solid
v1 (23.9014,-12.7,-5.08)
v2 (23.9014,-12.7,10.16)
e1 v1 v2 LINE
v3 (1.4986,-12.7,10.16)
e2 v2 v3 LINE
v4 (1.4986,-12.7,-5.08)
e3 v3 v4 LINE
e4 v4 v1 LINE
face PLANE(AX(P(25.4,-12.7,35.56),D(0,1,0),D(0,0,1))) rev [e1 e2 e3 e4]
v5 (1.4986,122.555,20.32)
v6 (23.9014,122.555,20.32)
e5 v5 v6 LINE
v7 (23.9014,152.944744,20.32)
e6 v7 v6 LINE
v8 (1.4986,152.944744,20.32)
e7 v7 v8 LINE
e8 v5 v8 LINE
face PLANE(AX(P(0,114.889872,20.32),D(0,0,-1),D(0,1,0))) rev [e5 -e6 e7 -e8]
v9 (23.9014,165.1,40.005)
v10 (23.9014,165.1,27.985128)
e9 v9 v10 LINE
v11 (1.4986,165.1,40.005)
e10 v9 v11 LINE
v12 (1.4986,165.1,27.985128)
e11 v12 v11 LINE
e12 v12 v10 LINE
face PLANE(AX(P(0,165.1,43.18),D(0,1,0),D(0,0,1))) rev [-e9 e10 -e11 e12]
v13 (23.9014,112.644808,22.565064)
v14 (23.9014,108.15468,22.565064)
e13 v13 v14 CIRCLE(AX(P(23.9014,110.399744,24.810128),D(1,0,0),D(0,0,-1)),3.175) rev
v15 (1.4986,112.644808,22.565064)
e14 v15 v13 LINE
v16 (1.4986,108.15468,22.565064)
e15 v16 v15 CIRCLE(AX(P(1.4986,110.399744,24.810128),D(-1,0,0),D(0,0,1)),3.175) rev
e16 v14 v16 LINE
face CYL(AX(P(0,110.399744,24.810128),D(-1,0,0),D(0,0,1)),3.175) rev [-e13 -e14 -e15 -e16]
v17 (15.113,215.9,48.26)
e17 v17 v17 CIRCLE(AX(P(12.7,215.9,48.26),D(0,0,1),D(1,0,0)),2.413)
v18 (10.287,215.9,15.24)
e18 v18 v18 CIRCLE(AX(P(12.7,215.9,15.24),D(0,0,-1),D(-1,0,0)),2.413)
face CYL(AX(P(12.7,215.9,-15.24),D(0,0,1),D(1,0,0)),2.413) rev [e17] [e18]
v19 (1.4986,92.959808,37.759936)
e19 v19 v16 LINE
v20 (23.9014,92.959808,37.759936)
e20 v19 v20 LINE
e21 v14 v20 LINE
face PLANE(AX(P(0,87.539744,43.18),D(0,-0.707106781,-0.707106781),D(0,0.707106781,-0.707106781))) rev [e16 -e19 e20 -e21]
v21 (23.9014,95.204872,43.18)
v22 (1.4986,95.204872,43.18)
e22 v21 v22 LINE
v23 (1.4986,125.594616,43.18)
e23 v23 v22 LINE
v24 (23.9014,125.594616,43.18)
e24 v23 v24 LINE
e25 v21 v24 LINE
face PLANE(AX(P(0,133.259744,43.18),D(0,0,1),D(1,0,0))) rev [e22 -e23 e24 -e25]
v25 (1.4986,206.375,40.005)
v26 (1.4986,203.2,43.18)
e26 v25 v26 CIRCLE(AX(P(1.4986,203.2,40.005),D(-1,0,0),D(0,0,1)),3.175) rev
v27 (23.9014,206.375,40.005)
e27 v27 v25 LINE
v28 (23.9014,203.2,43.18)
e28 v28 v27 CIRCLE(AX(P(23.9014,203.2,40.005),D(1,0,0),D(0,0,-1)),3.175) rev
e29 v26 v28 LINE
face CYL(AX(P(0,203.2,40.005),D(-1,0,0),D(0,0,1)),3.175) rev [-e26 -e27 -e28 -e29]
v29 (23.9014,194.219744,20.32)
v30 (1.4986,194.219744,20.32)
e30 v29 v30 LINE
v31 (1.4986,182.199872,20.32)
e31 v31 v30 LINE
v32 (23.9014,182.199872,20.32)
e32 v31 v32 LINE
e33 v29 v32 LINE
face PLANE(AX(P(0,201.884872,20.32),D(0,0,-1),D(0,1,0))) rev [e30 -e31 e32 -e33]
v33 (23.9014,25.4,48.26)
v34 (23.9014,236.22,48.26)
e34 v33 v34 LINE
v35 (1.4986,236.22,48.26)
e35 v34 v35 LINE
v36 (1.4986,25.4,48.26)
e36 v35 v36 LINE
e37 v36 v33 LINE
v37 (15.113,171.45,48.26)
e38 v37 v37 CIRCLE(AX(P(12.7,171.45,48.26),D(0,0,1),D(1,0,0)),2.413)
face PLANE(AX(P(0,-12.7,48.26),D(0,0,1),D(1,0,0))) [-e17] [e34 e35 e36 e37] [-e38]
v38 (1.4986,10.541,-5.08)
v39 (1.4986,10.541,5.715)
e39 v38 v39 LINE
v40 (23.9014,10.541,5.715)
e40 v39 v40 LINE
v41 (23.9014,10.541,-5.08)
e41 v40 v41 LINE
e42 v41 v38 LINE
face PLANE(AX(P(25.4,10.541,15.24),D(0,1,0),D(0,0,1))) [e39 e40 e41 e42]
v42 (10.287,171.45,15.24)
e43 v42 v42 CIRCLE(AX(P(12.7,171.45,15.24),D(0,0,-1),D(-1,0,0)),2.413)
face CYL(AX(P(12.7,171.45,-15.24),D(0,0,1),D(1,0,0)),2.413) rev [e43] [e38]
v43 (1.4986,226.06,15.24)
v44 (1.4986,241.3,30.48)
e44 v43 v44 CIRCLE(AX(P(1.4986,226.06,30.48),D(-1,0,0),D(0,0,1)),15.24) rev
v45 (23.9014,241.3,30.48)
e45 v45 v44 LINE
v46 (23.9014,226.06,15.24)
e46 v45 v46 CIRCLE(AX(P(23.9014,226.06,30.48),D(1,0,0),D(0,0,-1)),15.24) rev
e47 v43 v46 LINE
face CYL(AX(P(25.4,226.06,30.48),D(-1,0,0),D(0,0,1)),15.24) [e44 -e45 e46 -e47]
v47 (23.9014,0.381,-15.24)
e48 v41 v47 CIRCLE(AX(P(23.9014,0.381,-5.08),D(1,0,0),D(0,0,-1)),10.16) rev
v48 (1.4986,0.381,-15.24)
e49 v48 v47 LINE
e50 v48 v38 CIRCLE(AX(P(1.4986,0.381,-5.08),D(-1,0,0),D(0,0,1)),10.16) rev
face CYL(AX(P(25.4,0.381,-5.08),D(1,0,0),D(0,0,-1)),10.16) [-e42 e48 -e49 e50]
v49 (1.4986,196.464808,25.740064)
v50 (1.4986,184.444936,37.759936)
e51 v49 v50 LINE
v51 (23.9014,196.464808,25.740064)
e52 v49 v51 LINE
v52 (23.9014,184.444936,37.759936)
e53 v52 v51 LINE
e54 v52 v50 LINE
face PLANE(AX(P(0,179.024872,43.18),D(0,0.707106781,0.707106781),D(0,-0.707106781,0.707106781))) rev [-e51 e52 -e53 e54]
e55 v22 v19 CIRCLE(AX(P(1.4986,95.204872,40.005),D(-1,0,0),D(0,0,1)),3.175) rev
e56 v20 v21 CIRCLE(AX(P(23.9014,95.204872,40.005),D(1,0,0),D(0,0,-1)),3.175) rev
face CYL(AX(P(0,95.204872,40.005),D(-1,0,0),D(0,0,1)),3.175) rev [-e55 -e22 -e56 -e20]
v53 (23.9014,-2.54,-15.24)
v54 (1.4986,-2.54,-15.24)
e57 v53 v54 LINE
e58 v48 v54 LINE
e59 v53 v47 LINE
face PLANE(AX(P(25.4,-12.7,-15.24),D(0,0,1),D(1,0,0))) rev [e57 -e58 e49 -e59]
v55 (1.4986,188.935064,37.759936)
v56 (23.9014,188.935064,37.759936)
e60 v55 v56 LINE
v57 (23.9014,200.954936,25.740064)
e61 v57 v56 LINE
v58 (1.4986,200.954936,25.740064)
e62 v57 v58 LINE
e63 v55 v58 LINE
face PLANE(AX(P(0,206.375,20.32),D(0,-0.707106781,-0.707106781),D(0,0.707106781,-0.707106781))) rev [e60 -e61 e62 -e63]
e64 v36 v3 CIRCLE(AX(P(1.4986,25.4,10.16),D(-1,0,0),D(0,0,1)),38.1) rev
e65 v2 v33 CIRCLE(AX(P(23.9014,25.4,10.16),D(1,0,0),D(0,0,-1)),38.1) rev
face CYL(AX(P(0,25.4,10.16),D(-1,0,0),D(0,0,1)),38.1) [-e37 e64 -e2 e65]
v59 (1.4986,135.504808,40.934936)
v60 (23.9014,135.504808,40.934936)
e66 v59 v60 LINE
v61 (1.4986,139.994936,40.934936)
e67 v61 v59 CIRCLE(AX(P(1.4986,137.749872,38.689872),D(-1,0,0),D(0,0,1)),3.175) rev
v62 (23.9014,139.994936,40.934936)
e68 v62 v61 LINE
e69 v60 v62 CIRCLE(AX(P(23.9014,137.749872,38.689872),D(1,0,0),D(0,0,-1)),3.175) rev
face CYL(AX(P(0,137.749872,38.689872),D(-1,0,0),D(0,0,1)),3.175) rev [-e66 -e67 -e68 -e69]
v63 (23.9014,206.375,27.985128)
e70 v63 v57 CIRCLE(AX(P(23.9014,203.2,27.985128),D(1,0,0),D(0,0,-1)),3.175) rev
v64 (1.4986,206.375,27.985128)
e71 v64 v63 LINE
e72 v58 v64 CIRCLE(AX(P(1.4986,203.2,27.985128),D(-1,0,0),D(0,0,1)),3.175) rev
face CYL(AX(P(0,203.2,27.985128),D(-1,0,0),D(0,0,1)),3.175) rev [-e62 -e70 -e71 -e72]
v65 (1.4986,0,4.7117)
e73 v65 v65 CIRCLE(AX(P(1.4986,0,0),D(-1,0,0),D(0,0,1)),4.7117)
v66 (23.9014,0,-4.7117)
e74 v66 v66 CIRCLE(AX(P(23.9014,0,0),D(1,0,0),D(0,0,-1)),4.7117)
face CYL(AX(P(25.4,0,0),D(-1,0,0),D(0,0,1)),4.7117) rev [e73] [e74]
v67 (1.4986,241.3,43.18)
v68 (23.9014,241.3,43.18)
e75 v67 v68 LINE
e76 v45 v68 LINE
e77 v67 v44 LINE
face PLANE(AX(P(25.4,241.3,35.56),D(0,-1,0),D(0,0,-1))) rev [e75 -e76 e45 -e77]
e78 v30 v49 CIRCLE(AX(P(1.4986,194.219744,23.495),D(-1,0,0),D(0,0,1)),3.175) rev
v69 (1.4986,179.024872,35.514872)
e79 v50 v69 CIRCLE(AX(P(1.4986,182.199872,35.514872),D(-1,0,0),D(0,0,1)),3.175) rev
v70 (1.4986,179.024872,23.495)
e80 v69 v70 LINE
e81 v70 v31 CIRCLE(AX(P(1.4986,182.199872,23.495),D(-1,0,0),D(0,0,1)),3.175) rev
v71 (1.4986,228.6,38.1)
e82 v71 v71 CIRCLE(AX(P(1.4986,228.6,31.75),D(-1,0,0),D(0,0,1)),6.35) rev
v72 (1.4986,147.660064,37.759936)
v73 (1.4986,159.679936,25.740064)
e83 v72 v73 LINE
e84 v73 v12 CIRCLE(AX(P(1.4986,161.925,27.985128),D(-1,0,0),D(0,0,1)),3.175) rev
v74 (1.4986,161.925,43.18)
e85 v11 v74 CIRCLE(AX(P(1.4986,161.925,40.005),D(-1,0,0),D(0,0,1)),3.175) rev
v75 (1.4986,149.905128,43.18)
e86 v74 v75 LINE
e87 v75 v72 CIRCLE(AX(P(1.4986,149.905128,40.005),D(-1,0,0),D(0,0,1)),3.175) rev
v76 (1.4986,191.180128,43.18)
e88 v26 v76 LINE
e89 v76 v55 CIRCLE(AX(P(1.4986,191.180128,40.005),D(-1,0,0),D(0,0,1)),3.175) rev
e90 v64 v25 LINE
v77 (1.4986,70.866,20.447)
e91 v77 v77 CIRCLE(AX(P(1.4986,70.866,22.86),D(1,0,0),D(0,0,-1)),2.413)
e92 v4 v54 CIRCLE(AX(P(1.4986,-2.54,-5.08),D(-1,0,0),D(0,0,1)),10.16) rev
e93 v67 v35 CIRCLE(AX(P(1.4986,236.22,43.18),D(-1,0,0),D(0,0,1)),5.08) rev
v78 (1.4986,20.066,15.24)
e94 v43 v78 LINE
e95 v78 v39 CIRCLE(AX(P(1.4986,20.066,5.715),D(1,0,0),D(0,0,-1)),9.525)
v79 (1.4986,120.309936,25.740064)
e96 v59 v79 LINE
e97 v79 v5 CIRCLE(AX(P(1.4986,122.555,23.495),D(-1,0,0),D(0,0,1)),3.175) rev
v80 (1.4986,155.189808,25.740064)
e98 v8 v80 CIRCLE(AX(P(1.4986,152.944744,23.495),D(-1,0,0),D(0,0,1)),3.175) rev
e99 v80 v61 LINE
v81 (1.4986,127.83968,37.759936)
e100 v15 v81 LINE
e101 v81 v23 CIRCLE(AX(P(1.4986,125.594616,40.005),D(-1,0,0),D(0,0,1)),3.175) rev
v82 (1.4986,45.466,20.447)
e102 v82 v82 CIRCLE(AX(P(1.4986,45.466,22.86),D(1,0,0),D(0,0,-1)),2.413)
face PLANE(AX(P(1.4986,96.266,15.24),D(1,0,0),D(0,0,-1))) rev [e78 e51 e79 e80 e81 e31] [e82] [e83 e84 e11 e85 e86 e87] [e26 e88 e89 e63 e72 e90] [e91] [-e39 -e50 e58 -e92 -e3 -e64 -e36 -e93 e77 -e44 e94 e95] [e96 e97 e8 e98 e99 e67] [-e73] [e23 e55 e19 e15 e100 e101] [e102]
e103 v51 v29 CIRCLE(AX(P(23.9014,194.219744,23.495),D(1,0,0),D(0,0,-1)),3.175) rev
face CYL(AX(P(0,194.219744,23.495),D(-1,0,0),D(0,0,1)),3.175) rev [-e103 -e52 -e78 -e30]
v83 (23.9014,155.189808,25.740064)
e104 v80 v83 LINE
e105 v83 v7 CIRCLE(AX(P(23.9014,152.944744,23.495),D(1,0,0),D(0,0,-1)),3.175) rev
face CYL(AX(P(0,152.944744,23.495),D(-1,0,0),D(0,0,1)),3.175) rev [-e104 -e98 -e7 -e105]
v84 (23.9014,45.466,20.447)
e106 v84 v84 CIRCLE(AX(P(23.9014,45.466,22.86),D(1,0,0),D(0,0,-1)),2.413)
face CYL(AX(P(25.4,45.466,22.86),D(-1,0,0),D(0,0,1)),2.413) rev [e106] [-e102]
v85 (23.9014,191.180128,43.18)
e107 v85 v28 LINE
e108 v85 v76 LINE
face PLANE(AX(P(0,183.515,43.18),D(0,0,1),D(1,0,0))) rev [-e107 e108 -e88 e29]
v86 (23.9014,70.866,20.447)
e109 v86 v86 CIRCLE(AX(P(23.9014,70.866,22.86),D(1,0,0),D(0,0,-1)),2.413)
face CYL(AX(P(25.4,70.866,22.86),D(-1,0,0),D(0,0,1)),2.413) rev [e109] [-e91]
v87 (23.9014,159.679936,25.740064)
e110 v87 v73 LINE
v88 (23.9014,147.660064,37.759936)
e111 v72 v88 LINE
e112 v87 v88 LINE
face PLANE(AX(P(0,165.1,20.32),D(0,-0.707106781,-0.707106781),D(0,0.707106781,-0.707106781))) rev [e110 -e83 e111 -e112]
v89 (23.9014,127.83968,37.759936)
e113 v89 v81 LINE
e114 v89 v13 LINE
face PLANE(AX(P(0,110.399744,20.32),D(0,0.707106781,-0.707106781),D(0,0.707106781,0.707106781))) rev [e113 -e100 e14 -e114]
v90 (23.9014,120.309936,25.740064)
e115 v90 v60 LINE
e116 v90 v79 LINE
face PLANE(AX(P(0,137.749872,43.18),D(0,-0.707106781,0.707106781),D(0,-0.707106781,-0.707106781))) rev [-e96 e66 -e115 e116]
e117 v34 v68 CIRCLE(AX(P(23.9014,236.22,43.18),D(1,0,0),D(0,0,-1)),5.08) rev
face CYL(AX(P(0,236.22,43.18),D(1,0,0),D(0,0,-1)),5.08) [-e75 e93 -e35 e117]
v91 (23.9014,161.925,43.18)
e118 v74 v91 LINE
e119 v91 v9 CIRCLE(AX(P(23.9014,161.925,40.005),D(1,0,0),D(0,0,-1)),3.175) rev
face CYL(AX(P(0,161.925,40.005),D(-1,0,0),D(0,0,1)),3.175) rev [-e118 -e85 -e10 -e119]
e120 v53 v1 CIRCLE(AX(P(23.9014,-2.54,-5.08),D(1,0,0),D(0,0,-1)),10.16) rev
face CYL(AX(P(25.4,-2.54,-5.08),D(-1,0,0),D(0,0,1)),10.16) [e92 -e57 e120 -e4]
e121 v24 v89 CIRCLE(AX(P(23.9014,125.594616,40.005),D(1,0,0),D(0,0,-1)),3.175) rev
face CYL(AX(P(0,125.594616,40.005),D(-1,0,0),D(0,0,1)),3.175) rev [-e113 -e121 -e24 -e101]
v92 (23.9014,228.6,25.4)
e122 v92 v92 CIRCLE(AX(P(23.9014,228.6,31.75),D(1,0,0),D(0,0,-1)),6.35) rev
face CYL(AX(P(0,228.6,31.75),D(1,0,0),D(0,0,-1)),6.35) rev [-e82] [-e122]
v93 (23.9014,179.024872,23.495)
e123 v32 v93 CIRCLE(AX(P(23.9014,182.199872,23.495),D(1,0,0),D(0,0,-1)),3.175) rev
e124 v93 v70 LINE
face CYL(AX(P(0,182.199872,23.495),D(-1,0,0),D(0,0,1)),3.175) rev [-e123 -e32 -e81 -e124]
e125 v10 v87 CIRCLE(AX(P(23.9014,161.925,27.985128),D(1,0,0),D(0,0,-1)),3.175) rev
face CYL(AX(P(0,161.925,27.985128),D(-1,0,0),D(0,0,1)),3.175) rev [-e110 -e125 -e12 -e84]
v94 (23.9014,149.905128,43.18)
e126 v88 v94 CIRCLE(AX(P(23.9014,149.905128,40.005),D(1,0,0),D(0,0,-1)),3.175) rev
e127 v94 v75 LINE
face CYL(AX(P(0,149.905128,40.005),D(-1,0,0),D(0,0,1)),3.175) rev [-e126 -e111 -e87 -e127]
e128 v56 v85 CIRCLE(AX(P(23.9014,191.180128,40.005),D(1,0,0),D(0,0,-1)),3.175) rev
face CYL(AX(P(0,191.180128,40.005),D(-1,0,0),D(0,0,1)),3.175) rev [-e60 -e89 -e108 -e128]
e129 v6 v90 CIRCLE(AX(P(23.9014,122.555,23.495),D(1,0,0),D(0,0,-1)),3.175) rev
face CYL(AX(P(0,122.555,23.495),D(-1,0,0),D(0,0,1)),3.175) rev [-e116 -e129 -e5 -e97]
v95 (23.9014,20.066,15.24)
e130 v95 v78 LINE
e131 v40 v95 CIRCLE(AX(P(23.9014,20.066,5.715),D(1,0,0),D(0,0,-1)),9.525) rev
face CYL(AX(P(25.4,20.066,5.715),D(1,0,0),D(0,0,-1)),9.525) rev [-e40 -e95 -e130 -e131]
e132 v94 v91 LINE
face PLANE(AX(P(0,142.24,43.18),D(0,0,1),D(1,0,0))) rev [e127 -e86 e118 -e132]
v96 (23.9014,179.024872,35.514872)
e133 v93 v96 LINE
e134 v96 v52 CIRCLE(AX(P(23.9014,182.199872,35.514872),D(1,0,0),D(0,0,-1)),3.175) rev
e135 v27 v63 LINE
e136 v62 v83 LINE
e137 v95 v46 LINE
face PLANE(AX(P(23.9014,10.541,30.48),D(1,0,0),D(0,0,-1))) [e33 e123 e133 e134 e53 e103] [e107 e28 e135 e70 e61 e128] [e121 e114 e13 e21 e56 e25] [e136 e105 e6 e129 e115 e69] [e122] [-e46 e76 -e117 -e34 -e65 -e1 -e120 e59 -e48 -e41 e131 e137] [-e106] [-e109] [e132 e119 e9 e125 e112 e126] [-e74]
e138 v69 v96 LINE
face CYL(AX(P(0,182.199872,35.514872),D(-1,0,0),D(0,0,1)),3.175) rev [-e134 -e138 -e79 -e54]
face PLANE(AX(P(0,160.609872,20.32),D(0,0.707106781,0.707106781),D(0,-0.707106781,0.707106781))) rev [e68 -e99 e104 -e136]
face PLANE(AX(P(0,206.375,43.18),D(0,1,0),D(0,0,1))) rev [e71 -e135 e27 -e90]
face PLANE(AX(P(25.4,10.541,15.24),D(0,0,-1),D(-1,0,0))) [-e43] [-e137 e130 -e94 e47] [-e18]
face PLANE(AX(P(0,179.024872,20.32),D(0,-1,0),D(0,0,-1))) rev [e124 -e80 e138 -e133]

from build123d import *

# Parameters (mm, degrees)
SKETCH3_W               = 50.8
SKETCH3_H               = 254
BOSS_EXTRUDE1_DEPTH     = 25.4
SKETCH4_R               = 4.7117
CUT_EXTRUDE1_DEPTH      = 246.225128402
SKETCH5_R               = 2.413
CUT_EXTRUDE2_DEPTH      = 246.225128402
SKETCH6_W               = 45.72
SKETCH6_H               = 85.725
CUT_EXTRUDE3_DEPTH      = 246.225128402
SKETCH7_W               = 15.24
SKETCH7_H               = 85.725
CUT_EXTRUDE4_DEPTH      = 1.4986
SKETCH8_W               = 15.24
SKETCH8_H               = 85.725
CUT_EXTRUDE5_DEPTH      = 1.4986
SKETCH9_W               = 30.48
SKETCH9_H               = 230.759
CUT_EXTRUDE6_DEPTH      = 246.225128402
FILLET5_R               = 6.35
SKETCH14_W              = 25.4
SKETCH14_H              = 254
BOSS_EXTRUDE2_DEPTH     = 12.7
FILLET8_R               = 38.1
FILLET9_R               = 9.525
FILLET10_R              = 10.16
FILLET11_R              = 15.24
FILLET12_R              = 5.08
SKETCH18_R              = 2.413
CUT_EXTRUDE8_DEPTH      = 251.804904258
CUT_EXTRUDE9_DEPTH      = 248.386090151
FILLET13_R              = 3.175
SKETCH20_R              = 6.35
CUT_EXTRUDE10_DEPTH     = 248.386090151
CUT_EXTRUDE11_START     = -254
CUT_EXTRUDE11_OUTLINE_W = 1.4986
CUT_EXTRUDE11_OUTLINE_H = 63.5
CUT_EXTRUDE11_DEPTH     = 254


# Read off the part's stored shape, not the designer's step: Cut-Extrude11
with BuildPart() as part:
    # Sketch3 → Boss-Extrude1 (new body)
    with BuildSketch(Plane(origin=(0, 0, 0), x_dir=(0, 0, -1), z_dir=(1, 0, 0))):
        with Locations((-10.16, 114.3)):
            Rectangle(SKETCH3_W, SKETCH3_H)
    extrude(amount=BOSS_EXTRUDE1_DEPTH)

    # Sketch4 → Cut-Extrude1 (cut, through all)
    with BuildSketch(Plane(origin=(0, 0, 0), x_dir=(0, 0, -1), z_dir=(1, 0, 0))):
        Circle(SKETCH4_R)
    extrude(amount=CUT_EXTRUDE1_DEPTH, mode=Mode.SUBTRACT)

    # Sketch5 → Cut-Extrude2 (cut, through all)
    with BuildSketch(Plane(origin=(0, 0, 0), x_dir=(0, 0, -1), z_dir=(1, 0, 0))):
        with Locations((-22.86, 70.866)):
            Circle(SKETCH5_R)
        with Locations((-22.86, 45.466)):
            Circle(SKETCH5_R)
    extrude(amount=CUT_EXTRUDE2_DEPTH, mode=Mode.SUBTRACT)

    # Sketch6 → Cut-Extrude3 (cut, through all)
    with BuildSketch(Plane(origin=(0, 0, 0), x_dir=(0, 0, -1), z_dir=(1, 0, 0))):
        with Locations((7.62, 53.4035)):
            Rectangle(SKETCH6_W, SKETCH6_H)
    extrude(amount=CUT_EXTRUDE3_DEPTH, mode=Mode.SUBTRACT)

    # Sketch7 → Cut-Extrude4 (cut)
    with BuildSketch(Plane(origin=(25.4, 0, 0), x_dir=(0, 0, -1), z_dir=(1, 0, 0))):
        with Locations((-22.86, 53.4035)):
            Rectangle(SKETCH7_W, SKETCH7_H)
    extrude(amount=-CUT_EXTRUDE4_DEPTH, mode=Mode.SUBTRACT)

    # Sketch8 → Cut-Extrude5 (cut)
    with BuildSketch(Plane.ZY):
        with Locations((22.86, 53.4035)):
            Rectangle(SKETCH8_W, SKETCH8_H)
    extrude(amount=-CUT_EXTRUDE5_DEPTH, mode=Mode.SUBTRACT)

    # Sketch9 → Cut-Extrude6 (cut, through all)
    with BuildSketch(Plane(origin=(25.4, 0, 0), x_dir=(0, 0, -1), z_dir=(1, 0, 0))):
        with Locations((0, 125.9205)):
            Rectangle(SKETCH9_W, SKETCH9_H)
    extrude(amount=-CUT_EXTRUDE6_DEPTH, mode=Mode.SUBTRACT)

    # Fillet5
    fillet5_edges = [part.edges().sort_by_distance(p)[0] for p in [
        (24.6507, 10.541, 30.48),
        (24.6507, 96.266, 30.48),
        (0.7493, 96.266, 30.48),
        (0.7493, 10.541, 30.48),
    ]]
    fillet(fillet5_edges, radius=FILLET5_R)

    # Sketch14 → Boss-Extrude2 (add)
    with BuildSketch(Plane.XY.offset(35.56)):
        with Locations((12.7, 114.3)):
            Rectangle(SKETCH14_W, SKETCH14_H)
    extrude(amount=BOSS_EXTRUDE2_DEPTH)

    # Fillet8
    fillet8_edges = [part.edges().sort_by_distance(p)[0] for p in [
        (12.7, -12.7, 48.26),
    ]]
    fillet(fillet8_edges, radius=FILLET8_R)

    # Fillet9
    fillet9_edges = [part.edges().sort_by_distance(p)[0] for p in [
        (12.7, 10.541, 15.24),
    ]]
    fillet(fillet9_edges, radius=FILLET9_R)

    # Fillet10
    fillet10_edges = [part.edges().sort_by_distance(p)[0] for p in [
        (12.7, 10.541, -15.24),
        (12.7, -12.7, -15.24),
    ]]
    fillet(fillet10_edges, radius=FILLET10_R)

    # Fillet11
    fillet11_edges = [part.edges().sort_by_distance(p)[0] for p in [
        (12.7, 241.3, 15.24),
    ]]
    fillet(fillet11_edges, radius=FILLET11_R)

    # Fillet12
    fillet12_edges = [part.edges().sort_by_distance(p)[0] for p in [
        (12.7, 241.3, 48.26),
    ]]
    fillet(fillet12_edges, radius=FILLET12_R)

    # Sketch18 → Cut-Extrude8 (cut, through all)
    with BuildSketch(Plane.XY.offset(48.26)):
        with Locations((12.7, 215.9)):
            Circle(SKETCH18_R)
        with Locations((12.7, 171.45)):
            Circle(SKETCH18_R)
    extrude(amount=-CUT_EXTRUDE8_DEPTH, mode=Mode.SUBTRACT)

    # Sketch19 → Cut-Extrude9 (cut, through all)
    with BuildSketch(Plane(origin=(25.4, 0, 0), x_dir=(0, 0, -1), z_dir=(1, 0, 0))):
        Polygon((-20.32, 110.399743879), (-43.18, 133.259743879), (-43.18, 110.399743879), (-43.18, 87.539743879), align=None)
        Polygon((-43.18, 137.749871939), (-20.32, 114.889871939), (-20.32, 160.609871939), align=None)
        Polygon((-43.18, 165.1), (-20.32, 165.1), (-43.18, 142.24), align=None)
        Polygon((-43.18, 206.375), (-20.32, 206.375), (-43.18, 183.515), align=None)
        Polygon((-43.18, 179.024871939), (-20.32, 201.884871939), (-20.32, 179.024871939), align=None)
    extrude(amount=-CUT_EXTRUDE9_DEPTH, mode=Mode.SUBTRACT)

    # Fillet13
    fillet13_edges = [part.edges().sort_by_distance(p)[0] for p in [
        (12.7, 87.539743879, 43.18),
        (12.7, 133.259743879, 43.18),
        (12.7, 110.399743879, 20.32),
        (12.7, 137.749871939, 43.18),
        (12.7, 160.609871939, 20.32),
        (12.7, 114.889871939, 20.32),
        (12.7, 142.24, 43.18),
        (12.7, 165.1, 43.18),
        (12.7, 165.1, 20.32),
        (12.7, 183.515, 43.18),
        (12.7, 206.375, 43.18),
        (12.7, 206.375, 20.32),
        (12.7, 179.024871939, 20.32),
        (12.7, 179.024871939, 43.18),
        (12.7, 201.884871939, 20.32),
    ]]
    fillet(fillet13_edges, radius=FILLET13_R)

    # Sketch20 → Cut-Extrude10 (cut, through all)
    with BuildSketch(Plane(origin=(25.4, 0, 0), x_dir=(0, 0, -1), z_dir=(1, 0, 0))):
        with Locations((-31.75, 228.6)):
            Circle(SKETCH20_R)
    extrude(amount=-CUT_EXTRUDE10_DEPTH, mode=Mode.SUBTRACT)

    # Cut-Extrude11 outline → Cut-Extrude11 (cut)
    with BuildSketch(Plane.XZ.offset(12.7).offset(CUT_EXTRUDE11_START)):
        with Locations((24.6507, 16.51)):
            Rectangle(CUT_EXTRUDE11_OUTLINE_W, CUT_EXTRUDE11_OUTLINE_H)
        with Locations((0.7493, 16.51)):
            Rectangle(CUT_EXTRUDE11_OUTLINE_W, CUT_EXTRUDE11_OUTLINE_H)
    extrude(amount=CUT_EXTRUDE11_DEPTH, mode=Mode.SUBTRACT)


solid = part.part
